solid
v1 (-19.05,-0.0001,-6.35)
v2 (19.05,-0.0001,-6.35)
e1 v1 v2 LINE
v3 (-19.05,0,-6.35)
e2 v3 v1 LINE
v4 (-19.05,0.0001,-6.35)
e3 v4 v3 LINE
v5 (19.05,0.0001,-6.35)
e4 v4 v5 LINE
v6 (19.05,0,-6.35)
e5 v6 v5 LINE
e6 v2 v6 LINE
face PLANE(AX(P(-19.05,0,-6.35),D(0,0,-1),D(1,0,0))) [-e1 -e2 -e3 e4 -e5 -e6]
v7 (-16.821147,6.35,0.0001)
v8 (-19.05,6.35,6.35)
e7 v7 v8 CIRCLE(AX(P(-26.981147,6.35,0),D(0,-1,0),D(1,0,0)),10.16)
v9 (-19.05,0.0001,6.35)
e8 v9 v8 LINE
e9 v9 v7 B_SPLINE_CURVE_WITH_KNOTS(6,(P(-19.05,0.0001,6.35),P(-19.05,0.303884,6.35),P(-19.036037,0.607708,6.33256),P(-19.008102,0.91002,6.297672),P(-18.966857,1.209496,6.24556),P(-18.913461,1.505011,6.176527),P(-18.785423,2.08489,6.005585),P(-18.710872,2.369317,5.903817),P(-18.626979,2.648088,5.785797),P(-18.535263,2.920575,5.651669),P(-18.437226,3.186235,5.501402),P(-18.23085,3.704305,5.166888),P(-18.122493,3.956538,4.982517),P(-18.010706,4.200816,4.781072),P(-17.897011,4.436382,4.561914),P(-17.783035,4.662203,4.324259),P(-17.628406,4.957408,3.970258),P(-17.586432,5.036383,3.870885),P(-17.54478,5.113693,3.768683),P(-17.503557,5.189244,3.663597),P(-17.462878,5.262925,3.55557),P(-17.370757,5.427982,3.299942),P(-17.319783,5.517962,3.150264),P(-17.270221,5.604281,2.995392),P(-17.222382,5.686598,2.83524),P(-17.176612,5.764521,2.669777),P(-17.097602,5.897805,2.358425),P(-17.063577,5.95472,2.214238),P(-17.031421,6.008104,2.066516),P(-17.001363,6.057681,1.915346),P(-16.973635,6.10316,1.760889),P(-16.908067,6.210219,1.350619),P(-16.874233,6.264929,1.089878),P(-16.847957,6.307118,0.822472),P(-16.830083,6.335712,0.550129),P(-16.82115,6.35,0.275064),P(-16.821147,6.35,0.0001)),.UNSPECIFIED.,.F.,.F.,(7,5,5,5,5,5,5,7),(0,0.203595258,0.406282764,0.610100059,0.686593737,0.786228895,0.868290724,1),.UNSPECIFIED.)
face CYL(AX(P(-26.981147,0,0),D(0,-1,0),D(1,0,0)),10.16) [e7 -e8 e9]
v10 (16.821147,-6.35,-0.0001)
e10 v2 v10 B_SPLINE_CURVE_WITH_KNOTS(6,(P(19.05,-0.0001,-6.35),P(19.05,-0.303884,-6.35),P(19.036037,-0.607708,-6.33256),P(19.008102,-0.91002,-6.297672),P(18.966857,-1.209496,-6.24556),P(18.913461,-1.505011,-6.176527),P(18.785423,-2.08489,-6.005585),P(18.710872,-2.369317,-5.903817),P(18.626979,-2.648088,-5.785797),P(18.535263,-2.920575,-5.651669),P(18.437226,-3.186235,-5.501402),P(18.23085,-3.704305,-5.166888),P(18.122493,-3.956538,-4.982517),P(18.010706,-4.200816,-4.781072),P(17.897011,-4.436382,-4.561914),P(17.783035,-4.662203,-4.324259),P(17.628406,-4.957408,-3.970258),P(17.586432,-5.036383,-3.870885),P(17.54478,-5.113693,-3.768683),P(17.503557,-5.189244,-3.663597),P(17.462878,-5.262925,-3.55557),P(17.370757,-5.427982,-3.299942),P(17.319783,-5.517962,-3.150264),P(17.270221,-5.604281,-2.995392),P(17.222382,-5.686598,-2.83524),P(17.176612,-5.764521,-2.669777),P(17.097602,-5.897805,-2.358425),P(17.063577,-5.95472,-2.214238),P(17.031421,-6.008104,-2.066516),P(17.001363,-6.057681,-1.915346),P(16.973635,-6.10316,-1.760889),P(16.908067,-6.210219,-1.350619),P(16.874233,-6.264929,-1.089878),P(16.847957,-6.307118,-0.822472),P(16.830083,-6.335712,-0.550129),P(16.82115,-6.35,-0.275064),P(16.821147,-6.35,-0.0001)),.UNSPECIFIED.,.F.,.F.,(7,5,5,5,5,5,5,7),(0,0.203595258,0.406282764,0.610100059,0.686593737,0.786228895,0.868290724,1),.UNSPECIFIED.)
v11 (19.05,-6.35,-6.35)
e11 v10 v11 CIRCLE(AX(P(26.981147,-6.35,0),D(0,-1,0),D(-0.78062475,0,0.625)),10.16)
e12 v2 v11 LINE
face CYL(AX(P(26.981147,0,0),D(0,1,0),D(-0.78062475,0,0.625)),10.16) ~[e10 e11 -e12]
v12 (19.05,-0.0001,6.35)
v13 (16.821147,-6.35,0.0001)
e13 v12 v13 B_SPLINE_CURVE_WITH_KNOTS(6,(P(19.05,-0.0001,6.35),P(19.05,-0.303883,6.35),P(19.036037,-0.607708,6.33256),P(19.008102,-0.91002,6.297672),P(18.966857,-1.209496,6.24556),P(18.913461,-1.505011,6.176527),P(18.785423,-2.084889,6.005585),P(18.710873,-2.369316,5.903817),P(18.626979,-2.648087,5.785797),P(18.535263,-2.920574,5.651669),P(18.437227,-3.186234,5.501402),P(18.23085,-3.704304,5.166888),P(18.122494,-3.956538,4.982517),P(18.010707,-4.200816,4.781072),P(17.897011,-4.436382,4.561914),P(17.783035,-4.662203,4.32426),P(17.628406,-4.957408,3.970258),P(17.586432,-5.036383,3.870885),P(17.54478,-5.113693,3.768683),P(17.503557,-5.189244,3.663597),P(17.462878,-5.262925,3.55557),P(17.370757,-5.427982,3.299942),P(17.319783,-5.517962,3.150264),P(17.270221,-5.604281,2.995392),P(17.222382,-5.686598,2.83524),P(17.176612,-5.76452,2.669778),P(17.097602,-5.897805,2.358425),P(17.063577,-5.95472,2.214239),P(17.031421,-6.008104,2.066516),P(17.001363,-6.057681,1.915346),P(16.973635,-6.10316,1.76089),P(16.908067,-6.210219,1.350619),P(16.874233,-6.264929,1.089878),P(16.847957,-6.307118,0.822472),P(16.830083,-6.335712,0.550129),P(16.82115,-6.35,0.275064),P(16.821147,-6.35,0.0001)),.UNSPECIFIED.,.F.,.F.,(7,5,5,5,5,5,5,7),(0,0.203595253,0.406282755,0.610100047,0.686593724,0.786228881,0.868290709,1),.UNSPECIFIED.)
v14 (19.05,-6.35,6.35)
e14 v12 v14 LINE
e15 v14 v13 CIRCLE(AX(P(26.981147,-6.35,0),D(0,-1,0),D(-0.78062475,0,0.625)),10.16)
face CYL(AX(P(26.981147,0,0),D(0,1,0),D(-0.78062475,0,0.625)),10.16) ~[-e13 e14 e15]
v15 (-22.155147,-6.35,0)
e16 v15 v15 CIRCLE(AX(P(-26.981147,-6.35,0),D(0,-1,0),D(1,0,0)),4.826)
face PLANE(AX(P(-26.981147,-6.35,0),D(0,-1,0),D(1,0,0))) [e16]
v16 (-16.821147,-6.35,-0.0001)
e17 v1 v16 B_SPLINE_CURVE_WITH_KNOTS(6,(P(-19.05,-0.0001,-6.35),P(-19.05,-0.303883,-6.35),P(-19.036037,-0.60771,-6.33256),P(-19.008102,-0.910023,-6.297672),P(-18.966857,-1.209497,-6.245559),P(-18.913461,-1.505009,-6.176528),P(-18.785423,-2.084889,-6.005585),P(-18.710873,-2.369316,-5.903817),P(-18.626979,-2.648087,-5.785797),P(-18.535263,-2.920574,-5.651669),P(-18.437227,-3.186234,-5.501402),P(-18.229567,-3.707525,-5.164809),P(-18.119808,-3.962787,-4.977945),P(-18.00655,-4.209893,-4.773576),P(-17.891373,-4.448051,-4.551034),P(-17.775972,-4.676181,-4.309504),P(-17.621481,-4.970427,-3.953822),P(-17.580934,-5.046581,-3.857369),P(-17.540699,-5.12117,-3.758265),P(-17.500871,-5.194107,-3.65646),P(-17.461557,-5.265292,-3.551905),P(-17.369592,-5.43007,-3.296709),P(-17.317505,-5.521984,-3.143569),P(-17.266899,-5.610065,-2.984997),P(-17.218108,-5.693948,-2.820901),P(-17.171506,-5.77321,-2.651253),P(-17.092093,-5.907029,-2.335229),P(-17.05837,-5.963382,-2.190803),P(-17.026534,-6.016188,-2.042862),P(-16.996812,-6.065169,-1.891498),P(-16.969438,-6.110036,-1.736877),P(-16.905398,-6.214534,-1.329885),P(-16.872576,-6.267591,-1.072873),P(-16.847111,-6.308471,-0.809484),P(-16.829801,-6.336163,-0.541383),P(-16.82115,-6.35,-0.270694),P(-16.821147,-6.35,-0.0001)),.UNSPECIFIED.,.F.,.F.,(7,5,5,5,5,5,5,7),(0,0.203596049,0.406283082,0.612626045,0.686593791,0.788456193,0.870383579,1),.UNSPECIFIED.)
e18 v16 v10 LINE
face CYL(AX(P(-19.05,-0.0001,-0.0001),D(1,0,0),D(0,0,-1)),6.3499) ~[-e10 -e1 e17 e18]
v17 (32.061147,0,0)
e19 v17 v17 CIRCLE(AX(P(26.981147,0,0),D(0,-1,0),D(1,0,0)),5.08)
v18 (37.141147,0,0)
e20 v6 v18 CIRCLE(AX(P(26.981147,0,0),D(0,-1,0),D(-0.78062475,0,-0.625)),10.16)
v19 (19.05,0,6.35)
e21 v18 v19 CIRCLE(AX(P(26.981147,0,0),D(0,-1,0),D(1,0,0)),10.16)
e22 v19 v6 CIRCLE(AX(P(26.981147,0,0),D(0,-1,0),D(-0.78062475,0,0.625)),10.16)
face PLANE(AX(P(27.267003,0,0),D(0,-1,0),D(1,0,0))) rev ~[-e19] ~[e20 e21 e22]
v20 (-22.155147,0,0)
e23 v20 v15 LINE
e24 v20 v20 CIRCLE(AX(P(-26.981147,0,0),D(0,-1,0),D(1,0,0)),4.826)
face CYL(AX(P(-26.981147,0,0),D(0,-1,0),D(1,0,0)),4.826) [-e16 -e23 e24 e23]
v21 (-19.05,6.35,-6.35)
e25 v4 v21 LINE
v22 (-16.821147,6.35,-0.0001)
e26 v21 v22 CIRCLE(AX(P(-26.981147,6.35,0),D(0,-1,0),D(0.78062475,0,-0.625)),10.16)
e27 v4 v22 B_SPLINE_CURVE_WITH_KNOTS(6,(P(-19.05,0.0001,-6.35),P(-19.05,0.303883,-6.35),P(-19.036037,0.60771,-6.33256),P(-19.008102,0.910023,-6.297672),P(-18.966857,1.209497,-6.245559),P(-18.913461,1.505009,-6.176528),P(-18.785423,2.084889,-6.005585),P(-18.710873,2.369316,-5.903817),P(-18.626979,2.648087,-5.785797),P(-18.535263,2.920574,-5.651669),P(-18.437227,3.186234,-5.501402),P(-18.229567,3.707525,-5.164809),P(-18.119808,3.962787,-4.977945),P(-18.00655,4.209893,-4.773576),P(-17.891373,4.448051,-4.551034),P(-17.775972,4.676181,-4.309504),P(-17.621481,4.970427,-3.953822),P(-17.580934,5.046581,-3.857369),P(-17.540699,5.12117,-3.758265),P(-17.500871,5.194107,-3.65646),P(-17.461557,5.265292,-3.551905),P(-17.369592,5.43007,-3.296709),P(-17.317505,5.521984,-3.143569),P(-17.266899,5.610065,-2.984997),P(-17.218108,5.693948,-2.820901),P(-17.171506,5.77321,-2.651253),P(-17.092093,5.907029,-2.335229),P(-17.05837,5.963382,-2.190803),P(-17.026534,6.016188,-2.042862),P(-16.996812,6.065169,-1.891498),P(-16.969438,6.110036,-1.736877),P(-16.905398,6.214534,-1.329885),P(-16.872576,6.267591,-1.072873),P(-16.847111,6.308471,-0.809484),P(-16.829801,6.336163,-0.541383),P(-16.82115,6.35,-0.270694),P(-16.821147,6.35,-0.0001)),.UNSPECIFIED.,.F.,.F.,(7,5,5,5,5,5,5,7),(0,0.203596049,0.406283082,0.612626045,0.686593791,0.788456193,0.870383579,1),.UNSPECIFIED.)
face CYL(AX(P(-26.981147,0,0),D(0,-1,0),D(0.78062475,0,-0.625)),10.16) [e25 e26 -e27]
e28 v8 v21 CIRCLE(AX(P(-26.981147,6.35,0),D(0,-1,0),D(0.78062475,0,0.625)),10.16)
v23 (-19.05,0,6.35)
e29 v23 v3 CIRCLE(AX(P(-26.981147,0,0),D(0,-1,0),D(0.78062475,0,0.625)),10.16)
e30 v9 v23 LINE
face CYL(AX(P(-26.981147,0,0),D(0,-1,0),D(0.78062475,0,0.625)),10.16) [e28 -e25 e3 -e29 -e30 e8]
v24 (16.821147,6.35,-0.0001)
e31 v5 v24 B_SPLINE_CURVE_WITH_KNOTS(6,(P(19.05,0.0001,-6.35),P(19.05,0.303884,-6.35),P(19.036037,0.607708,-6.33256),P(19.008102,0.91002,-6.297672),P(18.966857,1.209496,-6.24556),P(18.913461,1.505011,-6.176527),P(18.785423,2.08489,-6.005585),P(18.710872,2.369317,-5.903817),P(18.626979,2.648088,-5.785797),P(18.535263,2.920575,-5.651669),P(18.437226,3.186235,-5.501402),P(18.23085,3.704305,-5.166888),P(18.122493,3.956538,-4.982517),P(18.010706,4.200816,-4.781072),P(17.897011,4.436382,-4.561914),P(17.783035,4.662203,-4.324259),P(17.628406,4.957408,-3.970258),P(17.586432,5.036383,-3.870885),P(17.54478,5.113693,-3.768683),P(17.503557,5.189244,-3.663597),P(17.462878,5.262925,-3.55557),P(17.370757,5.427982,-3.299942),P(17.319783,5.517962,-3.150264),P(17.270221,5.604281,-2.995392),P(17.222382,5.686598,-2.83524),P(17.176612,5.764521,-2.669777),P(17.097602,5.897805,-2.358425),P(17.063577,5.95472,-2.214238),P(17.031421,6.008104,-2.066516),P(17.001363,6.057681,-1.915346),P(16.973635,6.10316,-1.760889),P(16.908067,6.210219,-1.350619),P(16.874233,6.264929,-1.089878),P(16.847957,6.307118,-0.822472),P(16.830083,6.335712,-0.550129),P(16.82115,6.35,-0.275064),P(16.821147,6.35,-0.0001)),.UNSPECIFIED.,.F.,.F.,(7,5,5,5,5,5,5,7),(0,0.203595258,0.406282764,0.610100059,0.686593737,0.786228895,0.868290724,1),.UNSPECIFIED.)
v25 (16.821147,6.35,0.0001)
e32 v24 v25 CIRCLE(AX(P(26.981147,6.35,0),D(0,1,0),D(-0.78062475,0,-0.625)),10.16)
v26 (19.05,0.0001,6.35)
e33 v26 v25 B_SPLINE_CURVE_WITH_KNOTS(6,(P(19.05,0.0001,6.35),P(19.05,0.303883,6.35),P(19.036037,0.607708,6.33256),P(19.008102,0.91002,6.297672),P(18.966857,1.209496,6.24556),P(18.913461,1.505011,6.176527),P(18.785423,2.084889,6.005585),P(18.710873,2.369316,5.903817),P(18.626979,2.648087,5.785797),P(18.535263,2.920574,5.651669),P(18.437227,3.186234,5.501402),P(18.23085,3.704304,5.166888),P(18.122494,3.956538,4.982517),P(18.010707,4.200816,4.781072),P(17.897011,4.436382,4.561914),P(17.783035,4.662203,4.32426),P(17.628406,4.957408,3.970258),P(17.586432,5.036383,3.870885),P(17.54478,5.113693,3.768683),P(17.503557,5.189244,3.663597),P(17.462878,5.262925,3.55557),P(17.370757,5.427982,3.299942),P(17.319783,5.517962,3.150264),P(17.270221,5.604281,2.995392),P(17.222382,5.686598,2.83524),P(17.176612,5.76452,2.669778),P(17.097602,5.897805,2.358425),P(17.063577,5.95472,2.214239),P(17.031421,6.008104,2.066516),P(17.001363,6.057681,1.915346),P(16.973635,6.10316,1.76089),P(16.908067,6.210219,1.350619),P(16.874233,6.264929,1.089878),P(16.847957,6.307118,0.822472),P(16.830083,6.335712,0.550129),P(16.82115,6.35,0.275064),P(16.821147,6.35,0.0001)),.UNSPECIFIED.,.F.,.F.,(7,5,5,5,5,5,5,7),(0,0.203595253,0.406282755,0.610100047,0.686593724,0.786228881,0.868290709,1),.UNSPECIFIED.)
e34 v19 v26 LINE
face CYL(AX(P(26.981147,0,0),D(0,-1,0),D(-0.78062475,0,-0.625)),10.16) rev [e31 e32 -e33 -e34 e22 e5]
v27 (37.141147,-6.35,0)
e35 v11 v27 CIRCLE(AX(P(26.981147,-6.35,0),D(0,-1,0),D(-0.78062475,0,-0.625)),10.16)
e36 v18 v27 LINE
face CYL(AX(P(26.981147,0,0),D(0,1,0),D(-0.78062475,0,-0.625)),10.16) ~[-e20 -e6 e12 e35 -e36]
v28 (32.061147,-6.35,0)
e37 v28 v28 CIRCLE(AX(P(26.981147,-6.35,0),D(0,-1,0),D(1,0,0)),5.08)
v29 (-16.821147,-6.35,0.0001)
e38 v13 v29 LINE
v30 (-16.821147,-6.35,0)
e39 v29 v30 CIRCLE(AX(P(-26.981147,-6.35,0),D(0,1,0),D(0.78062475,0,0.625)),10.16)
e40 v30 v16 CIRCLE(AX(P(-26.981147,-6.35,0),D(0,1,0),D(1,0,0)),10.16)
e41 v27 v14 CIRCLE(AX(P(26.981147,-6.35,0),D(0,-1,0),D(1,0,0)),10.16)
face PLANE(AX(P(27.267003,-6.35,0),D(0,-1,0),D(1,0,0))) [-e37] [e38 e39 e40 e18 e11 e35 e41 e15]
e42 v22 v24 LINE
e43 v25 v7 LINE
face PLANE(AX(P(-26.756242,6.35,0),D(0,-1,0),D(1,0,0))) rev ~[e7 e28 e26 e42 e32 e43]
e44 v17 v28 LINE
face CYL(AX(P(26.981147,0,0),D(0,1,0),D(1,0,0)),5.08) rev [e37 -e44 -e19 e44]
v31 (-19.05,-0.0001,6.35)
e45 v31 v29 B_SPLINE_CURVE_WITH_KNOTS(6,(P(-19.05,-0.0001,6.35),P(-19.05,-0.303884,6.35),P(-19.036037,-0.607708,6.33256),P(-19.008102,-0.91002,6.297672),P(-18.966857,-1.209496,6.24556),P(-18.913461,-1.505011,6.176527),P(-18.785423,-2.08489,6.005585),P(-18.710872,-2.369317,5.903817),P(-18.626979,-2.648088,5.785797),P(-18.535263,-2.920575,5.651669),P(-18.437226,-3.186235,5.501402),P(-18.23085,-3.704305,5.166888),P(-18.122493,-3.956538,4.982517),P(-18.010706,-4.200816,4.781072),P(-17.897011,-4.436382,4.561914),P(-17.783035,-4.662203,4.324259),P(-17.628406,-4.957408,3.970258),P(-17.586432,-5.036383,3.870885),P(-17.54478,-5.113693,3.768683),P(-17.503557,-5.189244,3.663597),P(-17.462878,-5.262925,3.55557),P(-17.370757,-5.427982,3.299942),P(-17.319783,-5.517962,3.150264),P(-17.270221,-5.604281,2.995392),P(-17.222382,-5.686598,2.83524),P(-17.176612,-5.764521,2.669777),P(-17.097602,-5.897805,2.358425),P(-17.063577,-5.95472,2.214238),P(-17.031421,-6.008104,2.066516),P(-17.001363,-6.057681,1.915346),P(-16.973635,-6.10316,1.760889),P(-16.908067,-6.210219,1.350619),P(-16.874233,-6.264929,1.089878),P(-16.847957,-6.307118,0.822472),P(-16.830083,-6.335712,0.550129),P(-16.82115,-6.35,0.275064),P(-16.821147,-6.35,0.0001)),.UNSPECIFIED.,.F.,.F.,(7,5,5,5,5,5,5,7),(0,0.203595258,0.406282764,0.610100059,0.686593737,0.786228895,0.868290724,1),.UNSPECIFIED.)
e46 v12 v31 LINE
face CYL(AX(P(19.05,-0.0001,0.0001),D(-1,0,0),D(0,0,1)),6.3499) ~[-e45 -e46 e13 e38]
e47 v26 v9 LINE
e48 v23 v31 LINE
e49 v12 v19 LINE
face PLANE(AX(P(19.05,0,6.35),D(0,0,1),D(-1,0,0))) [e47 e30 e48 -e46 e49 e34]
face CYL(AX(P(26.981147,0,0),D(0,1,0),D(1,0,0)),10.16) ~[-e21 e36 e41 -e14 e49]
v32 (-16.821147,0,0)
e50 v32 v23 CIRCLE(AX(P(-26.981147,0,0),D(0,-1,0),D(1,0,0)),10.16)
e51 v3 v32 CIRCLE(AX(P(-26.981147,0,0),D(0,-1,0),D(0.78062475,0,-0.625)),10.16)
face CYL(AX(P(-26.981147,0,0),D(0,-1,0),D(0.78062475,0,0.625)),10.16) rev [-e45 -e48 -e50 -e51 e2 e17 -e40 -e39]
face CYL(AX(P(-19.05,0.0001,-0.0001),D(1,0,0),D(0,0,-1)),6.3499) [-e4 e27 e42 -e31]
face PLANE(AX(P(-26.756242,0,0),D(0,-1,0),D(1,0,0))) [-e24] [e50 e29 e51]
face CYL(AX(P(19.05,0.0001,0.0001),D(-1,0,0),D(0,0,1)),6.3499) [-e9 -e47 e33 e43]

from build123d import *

# Parameters (mm, degrees)
F1_DEPTH = 6.35
F2_R     = 6.3499
F0_R     = 5.08
F3_DEPTH = 6.35
F0_R_2   = 4.826
F4_DEPTH = 6.35
F5_DEPTH = 6.35


# Not quite as in the source:
# - a fillet or chamfer is up to 0.001 mm smaller than in the source, because OpenCascade refuses the exact size


with BuildPart() as f1:
    # F0 (on Front) → F1 (new body, symmetric)
    with BuildSketch(Plane.XZ):
        with BuildLine():
            Line((19.05, 6.35), (-19.05, 6.35))
            ThreePointArc((-19.05, 6.35), (-17.3945407024, 3.3649028089), (-16.821147458, 0))
            ThreePointArc((-16.821147458, 0), (-17.3945407024, -3.3649028089), (-19.05, -6.35))
            Line((-19.05, -6.35), (19.05, -6.35))
            ThreePointArc((19.05, -6.35), (16.821147458, 0), (19.05, 6.35))
        make_face()
    extrude(amount=F1_DEPTH, both=True)

    # F2 (radius 6.35 in the source; OpenCascade refuses exactly that, so slightly less here)
    f2_edges = [f1.edges().sort_by_distance(p)[0] for p in [
        (0, -6.35, 6.35),
        (0, 6.35, 6.35),
        (0, -6.35, -6.35),
        (0, 6.35, -6.35),
    ]]
    fillet(f2_edges, radius=F2_R)

    # F0 (on Front) → F3 (join)
    with BuildSketch(Plane.XZ):
        with BuildLine():
            ThreePointArc((37.141147458, 0), (30.3460502669, 9.5866067556), (19.05, 6.35))
            Line((19.05, 6.35), (19.05, -6.35))
            ThreePointArc((19.05, -6.35), (30.3460502669, -9.5866067556), (37.141147458, 0))
        make_face()
        with Locations((26.981147458, 0)):
            Circle(F0_R, mode=Mode.SUBTRACT)
        with BuildLine():
            Line((19.05, -6.35), (19.05, 6.35))
            ThreePointArc((19.05, 6.35), (16.821147458, 0), (19.05, -6.35))
        make_face()
    extrude(amount=F3_DEPTH)

    # F0 (on Front) → F4 (join)
    with BuildSketch(Plane.XZ):
        with BuildLine():
            Line((-19.05, -6.35), (-19.05, 6.35))
            ThreePointArc((-19.05, 6.35), (-37.141147458, 0), (-19.05, -6.35))
        make_face()
        with Locations((-26.981147458, 0)):
            Circle(F0_R_2, mode=Mode.SUBTRACT)
        with BuildLine():
            ThreePointArc((-16.821147458, 0), (-17.3945407024, 3.3649028089), (-19.05, 6.35))
            Line((-19.05, 6.35), (-19.05, -6.35))
            ThreePointArc((-19.05, -6.35), (-17.3945407024, -3.3649028089), (-16.821147458, 0))
        make_face()
    extrude(amount=-F4_DEPTH)

    # F0 (on Front) → F5 (join, symmetric)
    with BuildSketch(Plane.XZ):
        with Locations((-26.981147458, 0)):
            Circle(F0_R_2)
    extrude(amount=F5_DEPTH, both=True)


solid = f1.part
